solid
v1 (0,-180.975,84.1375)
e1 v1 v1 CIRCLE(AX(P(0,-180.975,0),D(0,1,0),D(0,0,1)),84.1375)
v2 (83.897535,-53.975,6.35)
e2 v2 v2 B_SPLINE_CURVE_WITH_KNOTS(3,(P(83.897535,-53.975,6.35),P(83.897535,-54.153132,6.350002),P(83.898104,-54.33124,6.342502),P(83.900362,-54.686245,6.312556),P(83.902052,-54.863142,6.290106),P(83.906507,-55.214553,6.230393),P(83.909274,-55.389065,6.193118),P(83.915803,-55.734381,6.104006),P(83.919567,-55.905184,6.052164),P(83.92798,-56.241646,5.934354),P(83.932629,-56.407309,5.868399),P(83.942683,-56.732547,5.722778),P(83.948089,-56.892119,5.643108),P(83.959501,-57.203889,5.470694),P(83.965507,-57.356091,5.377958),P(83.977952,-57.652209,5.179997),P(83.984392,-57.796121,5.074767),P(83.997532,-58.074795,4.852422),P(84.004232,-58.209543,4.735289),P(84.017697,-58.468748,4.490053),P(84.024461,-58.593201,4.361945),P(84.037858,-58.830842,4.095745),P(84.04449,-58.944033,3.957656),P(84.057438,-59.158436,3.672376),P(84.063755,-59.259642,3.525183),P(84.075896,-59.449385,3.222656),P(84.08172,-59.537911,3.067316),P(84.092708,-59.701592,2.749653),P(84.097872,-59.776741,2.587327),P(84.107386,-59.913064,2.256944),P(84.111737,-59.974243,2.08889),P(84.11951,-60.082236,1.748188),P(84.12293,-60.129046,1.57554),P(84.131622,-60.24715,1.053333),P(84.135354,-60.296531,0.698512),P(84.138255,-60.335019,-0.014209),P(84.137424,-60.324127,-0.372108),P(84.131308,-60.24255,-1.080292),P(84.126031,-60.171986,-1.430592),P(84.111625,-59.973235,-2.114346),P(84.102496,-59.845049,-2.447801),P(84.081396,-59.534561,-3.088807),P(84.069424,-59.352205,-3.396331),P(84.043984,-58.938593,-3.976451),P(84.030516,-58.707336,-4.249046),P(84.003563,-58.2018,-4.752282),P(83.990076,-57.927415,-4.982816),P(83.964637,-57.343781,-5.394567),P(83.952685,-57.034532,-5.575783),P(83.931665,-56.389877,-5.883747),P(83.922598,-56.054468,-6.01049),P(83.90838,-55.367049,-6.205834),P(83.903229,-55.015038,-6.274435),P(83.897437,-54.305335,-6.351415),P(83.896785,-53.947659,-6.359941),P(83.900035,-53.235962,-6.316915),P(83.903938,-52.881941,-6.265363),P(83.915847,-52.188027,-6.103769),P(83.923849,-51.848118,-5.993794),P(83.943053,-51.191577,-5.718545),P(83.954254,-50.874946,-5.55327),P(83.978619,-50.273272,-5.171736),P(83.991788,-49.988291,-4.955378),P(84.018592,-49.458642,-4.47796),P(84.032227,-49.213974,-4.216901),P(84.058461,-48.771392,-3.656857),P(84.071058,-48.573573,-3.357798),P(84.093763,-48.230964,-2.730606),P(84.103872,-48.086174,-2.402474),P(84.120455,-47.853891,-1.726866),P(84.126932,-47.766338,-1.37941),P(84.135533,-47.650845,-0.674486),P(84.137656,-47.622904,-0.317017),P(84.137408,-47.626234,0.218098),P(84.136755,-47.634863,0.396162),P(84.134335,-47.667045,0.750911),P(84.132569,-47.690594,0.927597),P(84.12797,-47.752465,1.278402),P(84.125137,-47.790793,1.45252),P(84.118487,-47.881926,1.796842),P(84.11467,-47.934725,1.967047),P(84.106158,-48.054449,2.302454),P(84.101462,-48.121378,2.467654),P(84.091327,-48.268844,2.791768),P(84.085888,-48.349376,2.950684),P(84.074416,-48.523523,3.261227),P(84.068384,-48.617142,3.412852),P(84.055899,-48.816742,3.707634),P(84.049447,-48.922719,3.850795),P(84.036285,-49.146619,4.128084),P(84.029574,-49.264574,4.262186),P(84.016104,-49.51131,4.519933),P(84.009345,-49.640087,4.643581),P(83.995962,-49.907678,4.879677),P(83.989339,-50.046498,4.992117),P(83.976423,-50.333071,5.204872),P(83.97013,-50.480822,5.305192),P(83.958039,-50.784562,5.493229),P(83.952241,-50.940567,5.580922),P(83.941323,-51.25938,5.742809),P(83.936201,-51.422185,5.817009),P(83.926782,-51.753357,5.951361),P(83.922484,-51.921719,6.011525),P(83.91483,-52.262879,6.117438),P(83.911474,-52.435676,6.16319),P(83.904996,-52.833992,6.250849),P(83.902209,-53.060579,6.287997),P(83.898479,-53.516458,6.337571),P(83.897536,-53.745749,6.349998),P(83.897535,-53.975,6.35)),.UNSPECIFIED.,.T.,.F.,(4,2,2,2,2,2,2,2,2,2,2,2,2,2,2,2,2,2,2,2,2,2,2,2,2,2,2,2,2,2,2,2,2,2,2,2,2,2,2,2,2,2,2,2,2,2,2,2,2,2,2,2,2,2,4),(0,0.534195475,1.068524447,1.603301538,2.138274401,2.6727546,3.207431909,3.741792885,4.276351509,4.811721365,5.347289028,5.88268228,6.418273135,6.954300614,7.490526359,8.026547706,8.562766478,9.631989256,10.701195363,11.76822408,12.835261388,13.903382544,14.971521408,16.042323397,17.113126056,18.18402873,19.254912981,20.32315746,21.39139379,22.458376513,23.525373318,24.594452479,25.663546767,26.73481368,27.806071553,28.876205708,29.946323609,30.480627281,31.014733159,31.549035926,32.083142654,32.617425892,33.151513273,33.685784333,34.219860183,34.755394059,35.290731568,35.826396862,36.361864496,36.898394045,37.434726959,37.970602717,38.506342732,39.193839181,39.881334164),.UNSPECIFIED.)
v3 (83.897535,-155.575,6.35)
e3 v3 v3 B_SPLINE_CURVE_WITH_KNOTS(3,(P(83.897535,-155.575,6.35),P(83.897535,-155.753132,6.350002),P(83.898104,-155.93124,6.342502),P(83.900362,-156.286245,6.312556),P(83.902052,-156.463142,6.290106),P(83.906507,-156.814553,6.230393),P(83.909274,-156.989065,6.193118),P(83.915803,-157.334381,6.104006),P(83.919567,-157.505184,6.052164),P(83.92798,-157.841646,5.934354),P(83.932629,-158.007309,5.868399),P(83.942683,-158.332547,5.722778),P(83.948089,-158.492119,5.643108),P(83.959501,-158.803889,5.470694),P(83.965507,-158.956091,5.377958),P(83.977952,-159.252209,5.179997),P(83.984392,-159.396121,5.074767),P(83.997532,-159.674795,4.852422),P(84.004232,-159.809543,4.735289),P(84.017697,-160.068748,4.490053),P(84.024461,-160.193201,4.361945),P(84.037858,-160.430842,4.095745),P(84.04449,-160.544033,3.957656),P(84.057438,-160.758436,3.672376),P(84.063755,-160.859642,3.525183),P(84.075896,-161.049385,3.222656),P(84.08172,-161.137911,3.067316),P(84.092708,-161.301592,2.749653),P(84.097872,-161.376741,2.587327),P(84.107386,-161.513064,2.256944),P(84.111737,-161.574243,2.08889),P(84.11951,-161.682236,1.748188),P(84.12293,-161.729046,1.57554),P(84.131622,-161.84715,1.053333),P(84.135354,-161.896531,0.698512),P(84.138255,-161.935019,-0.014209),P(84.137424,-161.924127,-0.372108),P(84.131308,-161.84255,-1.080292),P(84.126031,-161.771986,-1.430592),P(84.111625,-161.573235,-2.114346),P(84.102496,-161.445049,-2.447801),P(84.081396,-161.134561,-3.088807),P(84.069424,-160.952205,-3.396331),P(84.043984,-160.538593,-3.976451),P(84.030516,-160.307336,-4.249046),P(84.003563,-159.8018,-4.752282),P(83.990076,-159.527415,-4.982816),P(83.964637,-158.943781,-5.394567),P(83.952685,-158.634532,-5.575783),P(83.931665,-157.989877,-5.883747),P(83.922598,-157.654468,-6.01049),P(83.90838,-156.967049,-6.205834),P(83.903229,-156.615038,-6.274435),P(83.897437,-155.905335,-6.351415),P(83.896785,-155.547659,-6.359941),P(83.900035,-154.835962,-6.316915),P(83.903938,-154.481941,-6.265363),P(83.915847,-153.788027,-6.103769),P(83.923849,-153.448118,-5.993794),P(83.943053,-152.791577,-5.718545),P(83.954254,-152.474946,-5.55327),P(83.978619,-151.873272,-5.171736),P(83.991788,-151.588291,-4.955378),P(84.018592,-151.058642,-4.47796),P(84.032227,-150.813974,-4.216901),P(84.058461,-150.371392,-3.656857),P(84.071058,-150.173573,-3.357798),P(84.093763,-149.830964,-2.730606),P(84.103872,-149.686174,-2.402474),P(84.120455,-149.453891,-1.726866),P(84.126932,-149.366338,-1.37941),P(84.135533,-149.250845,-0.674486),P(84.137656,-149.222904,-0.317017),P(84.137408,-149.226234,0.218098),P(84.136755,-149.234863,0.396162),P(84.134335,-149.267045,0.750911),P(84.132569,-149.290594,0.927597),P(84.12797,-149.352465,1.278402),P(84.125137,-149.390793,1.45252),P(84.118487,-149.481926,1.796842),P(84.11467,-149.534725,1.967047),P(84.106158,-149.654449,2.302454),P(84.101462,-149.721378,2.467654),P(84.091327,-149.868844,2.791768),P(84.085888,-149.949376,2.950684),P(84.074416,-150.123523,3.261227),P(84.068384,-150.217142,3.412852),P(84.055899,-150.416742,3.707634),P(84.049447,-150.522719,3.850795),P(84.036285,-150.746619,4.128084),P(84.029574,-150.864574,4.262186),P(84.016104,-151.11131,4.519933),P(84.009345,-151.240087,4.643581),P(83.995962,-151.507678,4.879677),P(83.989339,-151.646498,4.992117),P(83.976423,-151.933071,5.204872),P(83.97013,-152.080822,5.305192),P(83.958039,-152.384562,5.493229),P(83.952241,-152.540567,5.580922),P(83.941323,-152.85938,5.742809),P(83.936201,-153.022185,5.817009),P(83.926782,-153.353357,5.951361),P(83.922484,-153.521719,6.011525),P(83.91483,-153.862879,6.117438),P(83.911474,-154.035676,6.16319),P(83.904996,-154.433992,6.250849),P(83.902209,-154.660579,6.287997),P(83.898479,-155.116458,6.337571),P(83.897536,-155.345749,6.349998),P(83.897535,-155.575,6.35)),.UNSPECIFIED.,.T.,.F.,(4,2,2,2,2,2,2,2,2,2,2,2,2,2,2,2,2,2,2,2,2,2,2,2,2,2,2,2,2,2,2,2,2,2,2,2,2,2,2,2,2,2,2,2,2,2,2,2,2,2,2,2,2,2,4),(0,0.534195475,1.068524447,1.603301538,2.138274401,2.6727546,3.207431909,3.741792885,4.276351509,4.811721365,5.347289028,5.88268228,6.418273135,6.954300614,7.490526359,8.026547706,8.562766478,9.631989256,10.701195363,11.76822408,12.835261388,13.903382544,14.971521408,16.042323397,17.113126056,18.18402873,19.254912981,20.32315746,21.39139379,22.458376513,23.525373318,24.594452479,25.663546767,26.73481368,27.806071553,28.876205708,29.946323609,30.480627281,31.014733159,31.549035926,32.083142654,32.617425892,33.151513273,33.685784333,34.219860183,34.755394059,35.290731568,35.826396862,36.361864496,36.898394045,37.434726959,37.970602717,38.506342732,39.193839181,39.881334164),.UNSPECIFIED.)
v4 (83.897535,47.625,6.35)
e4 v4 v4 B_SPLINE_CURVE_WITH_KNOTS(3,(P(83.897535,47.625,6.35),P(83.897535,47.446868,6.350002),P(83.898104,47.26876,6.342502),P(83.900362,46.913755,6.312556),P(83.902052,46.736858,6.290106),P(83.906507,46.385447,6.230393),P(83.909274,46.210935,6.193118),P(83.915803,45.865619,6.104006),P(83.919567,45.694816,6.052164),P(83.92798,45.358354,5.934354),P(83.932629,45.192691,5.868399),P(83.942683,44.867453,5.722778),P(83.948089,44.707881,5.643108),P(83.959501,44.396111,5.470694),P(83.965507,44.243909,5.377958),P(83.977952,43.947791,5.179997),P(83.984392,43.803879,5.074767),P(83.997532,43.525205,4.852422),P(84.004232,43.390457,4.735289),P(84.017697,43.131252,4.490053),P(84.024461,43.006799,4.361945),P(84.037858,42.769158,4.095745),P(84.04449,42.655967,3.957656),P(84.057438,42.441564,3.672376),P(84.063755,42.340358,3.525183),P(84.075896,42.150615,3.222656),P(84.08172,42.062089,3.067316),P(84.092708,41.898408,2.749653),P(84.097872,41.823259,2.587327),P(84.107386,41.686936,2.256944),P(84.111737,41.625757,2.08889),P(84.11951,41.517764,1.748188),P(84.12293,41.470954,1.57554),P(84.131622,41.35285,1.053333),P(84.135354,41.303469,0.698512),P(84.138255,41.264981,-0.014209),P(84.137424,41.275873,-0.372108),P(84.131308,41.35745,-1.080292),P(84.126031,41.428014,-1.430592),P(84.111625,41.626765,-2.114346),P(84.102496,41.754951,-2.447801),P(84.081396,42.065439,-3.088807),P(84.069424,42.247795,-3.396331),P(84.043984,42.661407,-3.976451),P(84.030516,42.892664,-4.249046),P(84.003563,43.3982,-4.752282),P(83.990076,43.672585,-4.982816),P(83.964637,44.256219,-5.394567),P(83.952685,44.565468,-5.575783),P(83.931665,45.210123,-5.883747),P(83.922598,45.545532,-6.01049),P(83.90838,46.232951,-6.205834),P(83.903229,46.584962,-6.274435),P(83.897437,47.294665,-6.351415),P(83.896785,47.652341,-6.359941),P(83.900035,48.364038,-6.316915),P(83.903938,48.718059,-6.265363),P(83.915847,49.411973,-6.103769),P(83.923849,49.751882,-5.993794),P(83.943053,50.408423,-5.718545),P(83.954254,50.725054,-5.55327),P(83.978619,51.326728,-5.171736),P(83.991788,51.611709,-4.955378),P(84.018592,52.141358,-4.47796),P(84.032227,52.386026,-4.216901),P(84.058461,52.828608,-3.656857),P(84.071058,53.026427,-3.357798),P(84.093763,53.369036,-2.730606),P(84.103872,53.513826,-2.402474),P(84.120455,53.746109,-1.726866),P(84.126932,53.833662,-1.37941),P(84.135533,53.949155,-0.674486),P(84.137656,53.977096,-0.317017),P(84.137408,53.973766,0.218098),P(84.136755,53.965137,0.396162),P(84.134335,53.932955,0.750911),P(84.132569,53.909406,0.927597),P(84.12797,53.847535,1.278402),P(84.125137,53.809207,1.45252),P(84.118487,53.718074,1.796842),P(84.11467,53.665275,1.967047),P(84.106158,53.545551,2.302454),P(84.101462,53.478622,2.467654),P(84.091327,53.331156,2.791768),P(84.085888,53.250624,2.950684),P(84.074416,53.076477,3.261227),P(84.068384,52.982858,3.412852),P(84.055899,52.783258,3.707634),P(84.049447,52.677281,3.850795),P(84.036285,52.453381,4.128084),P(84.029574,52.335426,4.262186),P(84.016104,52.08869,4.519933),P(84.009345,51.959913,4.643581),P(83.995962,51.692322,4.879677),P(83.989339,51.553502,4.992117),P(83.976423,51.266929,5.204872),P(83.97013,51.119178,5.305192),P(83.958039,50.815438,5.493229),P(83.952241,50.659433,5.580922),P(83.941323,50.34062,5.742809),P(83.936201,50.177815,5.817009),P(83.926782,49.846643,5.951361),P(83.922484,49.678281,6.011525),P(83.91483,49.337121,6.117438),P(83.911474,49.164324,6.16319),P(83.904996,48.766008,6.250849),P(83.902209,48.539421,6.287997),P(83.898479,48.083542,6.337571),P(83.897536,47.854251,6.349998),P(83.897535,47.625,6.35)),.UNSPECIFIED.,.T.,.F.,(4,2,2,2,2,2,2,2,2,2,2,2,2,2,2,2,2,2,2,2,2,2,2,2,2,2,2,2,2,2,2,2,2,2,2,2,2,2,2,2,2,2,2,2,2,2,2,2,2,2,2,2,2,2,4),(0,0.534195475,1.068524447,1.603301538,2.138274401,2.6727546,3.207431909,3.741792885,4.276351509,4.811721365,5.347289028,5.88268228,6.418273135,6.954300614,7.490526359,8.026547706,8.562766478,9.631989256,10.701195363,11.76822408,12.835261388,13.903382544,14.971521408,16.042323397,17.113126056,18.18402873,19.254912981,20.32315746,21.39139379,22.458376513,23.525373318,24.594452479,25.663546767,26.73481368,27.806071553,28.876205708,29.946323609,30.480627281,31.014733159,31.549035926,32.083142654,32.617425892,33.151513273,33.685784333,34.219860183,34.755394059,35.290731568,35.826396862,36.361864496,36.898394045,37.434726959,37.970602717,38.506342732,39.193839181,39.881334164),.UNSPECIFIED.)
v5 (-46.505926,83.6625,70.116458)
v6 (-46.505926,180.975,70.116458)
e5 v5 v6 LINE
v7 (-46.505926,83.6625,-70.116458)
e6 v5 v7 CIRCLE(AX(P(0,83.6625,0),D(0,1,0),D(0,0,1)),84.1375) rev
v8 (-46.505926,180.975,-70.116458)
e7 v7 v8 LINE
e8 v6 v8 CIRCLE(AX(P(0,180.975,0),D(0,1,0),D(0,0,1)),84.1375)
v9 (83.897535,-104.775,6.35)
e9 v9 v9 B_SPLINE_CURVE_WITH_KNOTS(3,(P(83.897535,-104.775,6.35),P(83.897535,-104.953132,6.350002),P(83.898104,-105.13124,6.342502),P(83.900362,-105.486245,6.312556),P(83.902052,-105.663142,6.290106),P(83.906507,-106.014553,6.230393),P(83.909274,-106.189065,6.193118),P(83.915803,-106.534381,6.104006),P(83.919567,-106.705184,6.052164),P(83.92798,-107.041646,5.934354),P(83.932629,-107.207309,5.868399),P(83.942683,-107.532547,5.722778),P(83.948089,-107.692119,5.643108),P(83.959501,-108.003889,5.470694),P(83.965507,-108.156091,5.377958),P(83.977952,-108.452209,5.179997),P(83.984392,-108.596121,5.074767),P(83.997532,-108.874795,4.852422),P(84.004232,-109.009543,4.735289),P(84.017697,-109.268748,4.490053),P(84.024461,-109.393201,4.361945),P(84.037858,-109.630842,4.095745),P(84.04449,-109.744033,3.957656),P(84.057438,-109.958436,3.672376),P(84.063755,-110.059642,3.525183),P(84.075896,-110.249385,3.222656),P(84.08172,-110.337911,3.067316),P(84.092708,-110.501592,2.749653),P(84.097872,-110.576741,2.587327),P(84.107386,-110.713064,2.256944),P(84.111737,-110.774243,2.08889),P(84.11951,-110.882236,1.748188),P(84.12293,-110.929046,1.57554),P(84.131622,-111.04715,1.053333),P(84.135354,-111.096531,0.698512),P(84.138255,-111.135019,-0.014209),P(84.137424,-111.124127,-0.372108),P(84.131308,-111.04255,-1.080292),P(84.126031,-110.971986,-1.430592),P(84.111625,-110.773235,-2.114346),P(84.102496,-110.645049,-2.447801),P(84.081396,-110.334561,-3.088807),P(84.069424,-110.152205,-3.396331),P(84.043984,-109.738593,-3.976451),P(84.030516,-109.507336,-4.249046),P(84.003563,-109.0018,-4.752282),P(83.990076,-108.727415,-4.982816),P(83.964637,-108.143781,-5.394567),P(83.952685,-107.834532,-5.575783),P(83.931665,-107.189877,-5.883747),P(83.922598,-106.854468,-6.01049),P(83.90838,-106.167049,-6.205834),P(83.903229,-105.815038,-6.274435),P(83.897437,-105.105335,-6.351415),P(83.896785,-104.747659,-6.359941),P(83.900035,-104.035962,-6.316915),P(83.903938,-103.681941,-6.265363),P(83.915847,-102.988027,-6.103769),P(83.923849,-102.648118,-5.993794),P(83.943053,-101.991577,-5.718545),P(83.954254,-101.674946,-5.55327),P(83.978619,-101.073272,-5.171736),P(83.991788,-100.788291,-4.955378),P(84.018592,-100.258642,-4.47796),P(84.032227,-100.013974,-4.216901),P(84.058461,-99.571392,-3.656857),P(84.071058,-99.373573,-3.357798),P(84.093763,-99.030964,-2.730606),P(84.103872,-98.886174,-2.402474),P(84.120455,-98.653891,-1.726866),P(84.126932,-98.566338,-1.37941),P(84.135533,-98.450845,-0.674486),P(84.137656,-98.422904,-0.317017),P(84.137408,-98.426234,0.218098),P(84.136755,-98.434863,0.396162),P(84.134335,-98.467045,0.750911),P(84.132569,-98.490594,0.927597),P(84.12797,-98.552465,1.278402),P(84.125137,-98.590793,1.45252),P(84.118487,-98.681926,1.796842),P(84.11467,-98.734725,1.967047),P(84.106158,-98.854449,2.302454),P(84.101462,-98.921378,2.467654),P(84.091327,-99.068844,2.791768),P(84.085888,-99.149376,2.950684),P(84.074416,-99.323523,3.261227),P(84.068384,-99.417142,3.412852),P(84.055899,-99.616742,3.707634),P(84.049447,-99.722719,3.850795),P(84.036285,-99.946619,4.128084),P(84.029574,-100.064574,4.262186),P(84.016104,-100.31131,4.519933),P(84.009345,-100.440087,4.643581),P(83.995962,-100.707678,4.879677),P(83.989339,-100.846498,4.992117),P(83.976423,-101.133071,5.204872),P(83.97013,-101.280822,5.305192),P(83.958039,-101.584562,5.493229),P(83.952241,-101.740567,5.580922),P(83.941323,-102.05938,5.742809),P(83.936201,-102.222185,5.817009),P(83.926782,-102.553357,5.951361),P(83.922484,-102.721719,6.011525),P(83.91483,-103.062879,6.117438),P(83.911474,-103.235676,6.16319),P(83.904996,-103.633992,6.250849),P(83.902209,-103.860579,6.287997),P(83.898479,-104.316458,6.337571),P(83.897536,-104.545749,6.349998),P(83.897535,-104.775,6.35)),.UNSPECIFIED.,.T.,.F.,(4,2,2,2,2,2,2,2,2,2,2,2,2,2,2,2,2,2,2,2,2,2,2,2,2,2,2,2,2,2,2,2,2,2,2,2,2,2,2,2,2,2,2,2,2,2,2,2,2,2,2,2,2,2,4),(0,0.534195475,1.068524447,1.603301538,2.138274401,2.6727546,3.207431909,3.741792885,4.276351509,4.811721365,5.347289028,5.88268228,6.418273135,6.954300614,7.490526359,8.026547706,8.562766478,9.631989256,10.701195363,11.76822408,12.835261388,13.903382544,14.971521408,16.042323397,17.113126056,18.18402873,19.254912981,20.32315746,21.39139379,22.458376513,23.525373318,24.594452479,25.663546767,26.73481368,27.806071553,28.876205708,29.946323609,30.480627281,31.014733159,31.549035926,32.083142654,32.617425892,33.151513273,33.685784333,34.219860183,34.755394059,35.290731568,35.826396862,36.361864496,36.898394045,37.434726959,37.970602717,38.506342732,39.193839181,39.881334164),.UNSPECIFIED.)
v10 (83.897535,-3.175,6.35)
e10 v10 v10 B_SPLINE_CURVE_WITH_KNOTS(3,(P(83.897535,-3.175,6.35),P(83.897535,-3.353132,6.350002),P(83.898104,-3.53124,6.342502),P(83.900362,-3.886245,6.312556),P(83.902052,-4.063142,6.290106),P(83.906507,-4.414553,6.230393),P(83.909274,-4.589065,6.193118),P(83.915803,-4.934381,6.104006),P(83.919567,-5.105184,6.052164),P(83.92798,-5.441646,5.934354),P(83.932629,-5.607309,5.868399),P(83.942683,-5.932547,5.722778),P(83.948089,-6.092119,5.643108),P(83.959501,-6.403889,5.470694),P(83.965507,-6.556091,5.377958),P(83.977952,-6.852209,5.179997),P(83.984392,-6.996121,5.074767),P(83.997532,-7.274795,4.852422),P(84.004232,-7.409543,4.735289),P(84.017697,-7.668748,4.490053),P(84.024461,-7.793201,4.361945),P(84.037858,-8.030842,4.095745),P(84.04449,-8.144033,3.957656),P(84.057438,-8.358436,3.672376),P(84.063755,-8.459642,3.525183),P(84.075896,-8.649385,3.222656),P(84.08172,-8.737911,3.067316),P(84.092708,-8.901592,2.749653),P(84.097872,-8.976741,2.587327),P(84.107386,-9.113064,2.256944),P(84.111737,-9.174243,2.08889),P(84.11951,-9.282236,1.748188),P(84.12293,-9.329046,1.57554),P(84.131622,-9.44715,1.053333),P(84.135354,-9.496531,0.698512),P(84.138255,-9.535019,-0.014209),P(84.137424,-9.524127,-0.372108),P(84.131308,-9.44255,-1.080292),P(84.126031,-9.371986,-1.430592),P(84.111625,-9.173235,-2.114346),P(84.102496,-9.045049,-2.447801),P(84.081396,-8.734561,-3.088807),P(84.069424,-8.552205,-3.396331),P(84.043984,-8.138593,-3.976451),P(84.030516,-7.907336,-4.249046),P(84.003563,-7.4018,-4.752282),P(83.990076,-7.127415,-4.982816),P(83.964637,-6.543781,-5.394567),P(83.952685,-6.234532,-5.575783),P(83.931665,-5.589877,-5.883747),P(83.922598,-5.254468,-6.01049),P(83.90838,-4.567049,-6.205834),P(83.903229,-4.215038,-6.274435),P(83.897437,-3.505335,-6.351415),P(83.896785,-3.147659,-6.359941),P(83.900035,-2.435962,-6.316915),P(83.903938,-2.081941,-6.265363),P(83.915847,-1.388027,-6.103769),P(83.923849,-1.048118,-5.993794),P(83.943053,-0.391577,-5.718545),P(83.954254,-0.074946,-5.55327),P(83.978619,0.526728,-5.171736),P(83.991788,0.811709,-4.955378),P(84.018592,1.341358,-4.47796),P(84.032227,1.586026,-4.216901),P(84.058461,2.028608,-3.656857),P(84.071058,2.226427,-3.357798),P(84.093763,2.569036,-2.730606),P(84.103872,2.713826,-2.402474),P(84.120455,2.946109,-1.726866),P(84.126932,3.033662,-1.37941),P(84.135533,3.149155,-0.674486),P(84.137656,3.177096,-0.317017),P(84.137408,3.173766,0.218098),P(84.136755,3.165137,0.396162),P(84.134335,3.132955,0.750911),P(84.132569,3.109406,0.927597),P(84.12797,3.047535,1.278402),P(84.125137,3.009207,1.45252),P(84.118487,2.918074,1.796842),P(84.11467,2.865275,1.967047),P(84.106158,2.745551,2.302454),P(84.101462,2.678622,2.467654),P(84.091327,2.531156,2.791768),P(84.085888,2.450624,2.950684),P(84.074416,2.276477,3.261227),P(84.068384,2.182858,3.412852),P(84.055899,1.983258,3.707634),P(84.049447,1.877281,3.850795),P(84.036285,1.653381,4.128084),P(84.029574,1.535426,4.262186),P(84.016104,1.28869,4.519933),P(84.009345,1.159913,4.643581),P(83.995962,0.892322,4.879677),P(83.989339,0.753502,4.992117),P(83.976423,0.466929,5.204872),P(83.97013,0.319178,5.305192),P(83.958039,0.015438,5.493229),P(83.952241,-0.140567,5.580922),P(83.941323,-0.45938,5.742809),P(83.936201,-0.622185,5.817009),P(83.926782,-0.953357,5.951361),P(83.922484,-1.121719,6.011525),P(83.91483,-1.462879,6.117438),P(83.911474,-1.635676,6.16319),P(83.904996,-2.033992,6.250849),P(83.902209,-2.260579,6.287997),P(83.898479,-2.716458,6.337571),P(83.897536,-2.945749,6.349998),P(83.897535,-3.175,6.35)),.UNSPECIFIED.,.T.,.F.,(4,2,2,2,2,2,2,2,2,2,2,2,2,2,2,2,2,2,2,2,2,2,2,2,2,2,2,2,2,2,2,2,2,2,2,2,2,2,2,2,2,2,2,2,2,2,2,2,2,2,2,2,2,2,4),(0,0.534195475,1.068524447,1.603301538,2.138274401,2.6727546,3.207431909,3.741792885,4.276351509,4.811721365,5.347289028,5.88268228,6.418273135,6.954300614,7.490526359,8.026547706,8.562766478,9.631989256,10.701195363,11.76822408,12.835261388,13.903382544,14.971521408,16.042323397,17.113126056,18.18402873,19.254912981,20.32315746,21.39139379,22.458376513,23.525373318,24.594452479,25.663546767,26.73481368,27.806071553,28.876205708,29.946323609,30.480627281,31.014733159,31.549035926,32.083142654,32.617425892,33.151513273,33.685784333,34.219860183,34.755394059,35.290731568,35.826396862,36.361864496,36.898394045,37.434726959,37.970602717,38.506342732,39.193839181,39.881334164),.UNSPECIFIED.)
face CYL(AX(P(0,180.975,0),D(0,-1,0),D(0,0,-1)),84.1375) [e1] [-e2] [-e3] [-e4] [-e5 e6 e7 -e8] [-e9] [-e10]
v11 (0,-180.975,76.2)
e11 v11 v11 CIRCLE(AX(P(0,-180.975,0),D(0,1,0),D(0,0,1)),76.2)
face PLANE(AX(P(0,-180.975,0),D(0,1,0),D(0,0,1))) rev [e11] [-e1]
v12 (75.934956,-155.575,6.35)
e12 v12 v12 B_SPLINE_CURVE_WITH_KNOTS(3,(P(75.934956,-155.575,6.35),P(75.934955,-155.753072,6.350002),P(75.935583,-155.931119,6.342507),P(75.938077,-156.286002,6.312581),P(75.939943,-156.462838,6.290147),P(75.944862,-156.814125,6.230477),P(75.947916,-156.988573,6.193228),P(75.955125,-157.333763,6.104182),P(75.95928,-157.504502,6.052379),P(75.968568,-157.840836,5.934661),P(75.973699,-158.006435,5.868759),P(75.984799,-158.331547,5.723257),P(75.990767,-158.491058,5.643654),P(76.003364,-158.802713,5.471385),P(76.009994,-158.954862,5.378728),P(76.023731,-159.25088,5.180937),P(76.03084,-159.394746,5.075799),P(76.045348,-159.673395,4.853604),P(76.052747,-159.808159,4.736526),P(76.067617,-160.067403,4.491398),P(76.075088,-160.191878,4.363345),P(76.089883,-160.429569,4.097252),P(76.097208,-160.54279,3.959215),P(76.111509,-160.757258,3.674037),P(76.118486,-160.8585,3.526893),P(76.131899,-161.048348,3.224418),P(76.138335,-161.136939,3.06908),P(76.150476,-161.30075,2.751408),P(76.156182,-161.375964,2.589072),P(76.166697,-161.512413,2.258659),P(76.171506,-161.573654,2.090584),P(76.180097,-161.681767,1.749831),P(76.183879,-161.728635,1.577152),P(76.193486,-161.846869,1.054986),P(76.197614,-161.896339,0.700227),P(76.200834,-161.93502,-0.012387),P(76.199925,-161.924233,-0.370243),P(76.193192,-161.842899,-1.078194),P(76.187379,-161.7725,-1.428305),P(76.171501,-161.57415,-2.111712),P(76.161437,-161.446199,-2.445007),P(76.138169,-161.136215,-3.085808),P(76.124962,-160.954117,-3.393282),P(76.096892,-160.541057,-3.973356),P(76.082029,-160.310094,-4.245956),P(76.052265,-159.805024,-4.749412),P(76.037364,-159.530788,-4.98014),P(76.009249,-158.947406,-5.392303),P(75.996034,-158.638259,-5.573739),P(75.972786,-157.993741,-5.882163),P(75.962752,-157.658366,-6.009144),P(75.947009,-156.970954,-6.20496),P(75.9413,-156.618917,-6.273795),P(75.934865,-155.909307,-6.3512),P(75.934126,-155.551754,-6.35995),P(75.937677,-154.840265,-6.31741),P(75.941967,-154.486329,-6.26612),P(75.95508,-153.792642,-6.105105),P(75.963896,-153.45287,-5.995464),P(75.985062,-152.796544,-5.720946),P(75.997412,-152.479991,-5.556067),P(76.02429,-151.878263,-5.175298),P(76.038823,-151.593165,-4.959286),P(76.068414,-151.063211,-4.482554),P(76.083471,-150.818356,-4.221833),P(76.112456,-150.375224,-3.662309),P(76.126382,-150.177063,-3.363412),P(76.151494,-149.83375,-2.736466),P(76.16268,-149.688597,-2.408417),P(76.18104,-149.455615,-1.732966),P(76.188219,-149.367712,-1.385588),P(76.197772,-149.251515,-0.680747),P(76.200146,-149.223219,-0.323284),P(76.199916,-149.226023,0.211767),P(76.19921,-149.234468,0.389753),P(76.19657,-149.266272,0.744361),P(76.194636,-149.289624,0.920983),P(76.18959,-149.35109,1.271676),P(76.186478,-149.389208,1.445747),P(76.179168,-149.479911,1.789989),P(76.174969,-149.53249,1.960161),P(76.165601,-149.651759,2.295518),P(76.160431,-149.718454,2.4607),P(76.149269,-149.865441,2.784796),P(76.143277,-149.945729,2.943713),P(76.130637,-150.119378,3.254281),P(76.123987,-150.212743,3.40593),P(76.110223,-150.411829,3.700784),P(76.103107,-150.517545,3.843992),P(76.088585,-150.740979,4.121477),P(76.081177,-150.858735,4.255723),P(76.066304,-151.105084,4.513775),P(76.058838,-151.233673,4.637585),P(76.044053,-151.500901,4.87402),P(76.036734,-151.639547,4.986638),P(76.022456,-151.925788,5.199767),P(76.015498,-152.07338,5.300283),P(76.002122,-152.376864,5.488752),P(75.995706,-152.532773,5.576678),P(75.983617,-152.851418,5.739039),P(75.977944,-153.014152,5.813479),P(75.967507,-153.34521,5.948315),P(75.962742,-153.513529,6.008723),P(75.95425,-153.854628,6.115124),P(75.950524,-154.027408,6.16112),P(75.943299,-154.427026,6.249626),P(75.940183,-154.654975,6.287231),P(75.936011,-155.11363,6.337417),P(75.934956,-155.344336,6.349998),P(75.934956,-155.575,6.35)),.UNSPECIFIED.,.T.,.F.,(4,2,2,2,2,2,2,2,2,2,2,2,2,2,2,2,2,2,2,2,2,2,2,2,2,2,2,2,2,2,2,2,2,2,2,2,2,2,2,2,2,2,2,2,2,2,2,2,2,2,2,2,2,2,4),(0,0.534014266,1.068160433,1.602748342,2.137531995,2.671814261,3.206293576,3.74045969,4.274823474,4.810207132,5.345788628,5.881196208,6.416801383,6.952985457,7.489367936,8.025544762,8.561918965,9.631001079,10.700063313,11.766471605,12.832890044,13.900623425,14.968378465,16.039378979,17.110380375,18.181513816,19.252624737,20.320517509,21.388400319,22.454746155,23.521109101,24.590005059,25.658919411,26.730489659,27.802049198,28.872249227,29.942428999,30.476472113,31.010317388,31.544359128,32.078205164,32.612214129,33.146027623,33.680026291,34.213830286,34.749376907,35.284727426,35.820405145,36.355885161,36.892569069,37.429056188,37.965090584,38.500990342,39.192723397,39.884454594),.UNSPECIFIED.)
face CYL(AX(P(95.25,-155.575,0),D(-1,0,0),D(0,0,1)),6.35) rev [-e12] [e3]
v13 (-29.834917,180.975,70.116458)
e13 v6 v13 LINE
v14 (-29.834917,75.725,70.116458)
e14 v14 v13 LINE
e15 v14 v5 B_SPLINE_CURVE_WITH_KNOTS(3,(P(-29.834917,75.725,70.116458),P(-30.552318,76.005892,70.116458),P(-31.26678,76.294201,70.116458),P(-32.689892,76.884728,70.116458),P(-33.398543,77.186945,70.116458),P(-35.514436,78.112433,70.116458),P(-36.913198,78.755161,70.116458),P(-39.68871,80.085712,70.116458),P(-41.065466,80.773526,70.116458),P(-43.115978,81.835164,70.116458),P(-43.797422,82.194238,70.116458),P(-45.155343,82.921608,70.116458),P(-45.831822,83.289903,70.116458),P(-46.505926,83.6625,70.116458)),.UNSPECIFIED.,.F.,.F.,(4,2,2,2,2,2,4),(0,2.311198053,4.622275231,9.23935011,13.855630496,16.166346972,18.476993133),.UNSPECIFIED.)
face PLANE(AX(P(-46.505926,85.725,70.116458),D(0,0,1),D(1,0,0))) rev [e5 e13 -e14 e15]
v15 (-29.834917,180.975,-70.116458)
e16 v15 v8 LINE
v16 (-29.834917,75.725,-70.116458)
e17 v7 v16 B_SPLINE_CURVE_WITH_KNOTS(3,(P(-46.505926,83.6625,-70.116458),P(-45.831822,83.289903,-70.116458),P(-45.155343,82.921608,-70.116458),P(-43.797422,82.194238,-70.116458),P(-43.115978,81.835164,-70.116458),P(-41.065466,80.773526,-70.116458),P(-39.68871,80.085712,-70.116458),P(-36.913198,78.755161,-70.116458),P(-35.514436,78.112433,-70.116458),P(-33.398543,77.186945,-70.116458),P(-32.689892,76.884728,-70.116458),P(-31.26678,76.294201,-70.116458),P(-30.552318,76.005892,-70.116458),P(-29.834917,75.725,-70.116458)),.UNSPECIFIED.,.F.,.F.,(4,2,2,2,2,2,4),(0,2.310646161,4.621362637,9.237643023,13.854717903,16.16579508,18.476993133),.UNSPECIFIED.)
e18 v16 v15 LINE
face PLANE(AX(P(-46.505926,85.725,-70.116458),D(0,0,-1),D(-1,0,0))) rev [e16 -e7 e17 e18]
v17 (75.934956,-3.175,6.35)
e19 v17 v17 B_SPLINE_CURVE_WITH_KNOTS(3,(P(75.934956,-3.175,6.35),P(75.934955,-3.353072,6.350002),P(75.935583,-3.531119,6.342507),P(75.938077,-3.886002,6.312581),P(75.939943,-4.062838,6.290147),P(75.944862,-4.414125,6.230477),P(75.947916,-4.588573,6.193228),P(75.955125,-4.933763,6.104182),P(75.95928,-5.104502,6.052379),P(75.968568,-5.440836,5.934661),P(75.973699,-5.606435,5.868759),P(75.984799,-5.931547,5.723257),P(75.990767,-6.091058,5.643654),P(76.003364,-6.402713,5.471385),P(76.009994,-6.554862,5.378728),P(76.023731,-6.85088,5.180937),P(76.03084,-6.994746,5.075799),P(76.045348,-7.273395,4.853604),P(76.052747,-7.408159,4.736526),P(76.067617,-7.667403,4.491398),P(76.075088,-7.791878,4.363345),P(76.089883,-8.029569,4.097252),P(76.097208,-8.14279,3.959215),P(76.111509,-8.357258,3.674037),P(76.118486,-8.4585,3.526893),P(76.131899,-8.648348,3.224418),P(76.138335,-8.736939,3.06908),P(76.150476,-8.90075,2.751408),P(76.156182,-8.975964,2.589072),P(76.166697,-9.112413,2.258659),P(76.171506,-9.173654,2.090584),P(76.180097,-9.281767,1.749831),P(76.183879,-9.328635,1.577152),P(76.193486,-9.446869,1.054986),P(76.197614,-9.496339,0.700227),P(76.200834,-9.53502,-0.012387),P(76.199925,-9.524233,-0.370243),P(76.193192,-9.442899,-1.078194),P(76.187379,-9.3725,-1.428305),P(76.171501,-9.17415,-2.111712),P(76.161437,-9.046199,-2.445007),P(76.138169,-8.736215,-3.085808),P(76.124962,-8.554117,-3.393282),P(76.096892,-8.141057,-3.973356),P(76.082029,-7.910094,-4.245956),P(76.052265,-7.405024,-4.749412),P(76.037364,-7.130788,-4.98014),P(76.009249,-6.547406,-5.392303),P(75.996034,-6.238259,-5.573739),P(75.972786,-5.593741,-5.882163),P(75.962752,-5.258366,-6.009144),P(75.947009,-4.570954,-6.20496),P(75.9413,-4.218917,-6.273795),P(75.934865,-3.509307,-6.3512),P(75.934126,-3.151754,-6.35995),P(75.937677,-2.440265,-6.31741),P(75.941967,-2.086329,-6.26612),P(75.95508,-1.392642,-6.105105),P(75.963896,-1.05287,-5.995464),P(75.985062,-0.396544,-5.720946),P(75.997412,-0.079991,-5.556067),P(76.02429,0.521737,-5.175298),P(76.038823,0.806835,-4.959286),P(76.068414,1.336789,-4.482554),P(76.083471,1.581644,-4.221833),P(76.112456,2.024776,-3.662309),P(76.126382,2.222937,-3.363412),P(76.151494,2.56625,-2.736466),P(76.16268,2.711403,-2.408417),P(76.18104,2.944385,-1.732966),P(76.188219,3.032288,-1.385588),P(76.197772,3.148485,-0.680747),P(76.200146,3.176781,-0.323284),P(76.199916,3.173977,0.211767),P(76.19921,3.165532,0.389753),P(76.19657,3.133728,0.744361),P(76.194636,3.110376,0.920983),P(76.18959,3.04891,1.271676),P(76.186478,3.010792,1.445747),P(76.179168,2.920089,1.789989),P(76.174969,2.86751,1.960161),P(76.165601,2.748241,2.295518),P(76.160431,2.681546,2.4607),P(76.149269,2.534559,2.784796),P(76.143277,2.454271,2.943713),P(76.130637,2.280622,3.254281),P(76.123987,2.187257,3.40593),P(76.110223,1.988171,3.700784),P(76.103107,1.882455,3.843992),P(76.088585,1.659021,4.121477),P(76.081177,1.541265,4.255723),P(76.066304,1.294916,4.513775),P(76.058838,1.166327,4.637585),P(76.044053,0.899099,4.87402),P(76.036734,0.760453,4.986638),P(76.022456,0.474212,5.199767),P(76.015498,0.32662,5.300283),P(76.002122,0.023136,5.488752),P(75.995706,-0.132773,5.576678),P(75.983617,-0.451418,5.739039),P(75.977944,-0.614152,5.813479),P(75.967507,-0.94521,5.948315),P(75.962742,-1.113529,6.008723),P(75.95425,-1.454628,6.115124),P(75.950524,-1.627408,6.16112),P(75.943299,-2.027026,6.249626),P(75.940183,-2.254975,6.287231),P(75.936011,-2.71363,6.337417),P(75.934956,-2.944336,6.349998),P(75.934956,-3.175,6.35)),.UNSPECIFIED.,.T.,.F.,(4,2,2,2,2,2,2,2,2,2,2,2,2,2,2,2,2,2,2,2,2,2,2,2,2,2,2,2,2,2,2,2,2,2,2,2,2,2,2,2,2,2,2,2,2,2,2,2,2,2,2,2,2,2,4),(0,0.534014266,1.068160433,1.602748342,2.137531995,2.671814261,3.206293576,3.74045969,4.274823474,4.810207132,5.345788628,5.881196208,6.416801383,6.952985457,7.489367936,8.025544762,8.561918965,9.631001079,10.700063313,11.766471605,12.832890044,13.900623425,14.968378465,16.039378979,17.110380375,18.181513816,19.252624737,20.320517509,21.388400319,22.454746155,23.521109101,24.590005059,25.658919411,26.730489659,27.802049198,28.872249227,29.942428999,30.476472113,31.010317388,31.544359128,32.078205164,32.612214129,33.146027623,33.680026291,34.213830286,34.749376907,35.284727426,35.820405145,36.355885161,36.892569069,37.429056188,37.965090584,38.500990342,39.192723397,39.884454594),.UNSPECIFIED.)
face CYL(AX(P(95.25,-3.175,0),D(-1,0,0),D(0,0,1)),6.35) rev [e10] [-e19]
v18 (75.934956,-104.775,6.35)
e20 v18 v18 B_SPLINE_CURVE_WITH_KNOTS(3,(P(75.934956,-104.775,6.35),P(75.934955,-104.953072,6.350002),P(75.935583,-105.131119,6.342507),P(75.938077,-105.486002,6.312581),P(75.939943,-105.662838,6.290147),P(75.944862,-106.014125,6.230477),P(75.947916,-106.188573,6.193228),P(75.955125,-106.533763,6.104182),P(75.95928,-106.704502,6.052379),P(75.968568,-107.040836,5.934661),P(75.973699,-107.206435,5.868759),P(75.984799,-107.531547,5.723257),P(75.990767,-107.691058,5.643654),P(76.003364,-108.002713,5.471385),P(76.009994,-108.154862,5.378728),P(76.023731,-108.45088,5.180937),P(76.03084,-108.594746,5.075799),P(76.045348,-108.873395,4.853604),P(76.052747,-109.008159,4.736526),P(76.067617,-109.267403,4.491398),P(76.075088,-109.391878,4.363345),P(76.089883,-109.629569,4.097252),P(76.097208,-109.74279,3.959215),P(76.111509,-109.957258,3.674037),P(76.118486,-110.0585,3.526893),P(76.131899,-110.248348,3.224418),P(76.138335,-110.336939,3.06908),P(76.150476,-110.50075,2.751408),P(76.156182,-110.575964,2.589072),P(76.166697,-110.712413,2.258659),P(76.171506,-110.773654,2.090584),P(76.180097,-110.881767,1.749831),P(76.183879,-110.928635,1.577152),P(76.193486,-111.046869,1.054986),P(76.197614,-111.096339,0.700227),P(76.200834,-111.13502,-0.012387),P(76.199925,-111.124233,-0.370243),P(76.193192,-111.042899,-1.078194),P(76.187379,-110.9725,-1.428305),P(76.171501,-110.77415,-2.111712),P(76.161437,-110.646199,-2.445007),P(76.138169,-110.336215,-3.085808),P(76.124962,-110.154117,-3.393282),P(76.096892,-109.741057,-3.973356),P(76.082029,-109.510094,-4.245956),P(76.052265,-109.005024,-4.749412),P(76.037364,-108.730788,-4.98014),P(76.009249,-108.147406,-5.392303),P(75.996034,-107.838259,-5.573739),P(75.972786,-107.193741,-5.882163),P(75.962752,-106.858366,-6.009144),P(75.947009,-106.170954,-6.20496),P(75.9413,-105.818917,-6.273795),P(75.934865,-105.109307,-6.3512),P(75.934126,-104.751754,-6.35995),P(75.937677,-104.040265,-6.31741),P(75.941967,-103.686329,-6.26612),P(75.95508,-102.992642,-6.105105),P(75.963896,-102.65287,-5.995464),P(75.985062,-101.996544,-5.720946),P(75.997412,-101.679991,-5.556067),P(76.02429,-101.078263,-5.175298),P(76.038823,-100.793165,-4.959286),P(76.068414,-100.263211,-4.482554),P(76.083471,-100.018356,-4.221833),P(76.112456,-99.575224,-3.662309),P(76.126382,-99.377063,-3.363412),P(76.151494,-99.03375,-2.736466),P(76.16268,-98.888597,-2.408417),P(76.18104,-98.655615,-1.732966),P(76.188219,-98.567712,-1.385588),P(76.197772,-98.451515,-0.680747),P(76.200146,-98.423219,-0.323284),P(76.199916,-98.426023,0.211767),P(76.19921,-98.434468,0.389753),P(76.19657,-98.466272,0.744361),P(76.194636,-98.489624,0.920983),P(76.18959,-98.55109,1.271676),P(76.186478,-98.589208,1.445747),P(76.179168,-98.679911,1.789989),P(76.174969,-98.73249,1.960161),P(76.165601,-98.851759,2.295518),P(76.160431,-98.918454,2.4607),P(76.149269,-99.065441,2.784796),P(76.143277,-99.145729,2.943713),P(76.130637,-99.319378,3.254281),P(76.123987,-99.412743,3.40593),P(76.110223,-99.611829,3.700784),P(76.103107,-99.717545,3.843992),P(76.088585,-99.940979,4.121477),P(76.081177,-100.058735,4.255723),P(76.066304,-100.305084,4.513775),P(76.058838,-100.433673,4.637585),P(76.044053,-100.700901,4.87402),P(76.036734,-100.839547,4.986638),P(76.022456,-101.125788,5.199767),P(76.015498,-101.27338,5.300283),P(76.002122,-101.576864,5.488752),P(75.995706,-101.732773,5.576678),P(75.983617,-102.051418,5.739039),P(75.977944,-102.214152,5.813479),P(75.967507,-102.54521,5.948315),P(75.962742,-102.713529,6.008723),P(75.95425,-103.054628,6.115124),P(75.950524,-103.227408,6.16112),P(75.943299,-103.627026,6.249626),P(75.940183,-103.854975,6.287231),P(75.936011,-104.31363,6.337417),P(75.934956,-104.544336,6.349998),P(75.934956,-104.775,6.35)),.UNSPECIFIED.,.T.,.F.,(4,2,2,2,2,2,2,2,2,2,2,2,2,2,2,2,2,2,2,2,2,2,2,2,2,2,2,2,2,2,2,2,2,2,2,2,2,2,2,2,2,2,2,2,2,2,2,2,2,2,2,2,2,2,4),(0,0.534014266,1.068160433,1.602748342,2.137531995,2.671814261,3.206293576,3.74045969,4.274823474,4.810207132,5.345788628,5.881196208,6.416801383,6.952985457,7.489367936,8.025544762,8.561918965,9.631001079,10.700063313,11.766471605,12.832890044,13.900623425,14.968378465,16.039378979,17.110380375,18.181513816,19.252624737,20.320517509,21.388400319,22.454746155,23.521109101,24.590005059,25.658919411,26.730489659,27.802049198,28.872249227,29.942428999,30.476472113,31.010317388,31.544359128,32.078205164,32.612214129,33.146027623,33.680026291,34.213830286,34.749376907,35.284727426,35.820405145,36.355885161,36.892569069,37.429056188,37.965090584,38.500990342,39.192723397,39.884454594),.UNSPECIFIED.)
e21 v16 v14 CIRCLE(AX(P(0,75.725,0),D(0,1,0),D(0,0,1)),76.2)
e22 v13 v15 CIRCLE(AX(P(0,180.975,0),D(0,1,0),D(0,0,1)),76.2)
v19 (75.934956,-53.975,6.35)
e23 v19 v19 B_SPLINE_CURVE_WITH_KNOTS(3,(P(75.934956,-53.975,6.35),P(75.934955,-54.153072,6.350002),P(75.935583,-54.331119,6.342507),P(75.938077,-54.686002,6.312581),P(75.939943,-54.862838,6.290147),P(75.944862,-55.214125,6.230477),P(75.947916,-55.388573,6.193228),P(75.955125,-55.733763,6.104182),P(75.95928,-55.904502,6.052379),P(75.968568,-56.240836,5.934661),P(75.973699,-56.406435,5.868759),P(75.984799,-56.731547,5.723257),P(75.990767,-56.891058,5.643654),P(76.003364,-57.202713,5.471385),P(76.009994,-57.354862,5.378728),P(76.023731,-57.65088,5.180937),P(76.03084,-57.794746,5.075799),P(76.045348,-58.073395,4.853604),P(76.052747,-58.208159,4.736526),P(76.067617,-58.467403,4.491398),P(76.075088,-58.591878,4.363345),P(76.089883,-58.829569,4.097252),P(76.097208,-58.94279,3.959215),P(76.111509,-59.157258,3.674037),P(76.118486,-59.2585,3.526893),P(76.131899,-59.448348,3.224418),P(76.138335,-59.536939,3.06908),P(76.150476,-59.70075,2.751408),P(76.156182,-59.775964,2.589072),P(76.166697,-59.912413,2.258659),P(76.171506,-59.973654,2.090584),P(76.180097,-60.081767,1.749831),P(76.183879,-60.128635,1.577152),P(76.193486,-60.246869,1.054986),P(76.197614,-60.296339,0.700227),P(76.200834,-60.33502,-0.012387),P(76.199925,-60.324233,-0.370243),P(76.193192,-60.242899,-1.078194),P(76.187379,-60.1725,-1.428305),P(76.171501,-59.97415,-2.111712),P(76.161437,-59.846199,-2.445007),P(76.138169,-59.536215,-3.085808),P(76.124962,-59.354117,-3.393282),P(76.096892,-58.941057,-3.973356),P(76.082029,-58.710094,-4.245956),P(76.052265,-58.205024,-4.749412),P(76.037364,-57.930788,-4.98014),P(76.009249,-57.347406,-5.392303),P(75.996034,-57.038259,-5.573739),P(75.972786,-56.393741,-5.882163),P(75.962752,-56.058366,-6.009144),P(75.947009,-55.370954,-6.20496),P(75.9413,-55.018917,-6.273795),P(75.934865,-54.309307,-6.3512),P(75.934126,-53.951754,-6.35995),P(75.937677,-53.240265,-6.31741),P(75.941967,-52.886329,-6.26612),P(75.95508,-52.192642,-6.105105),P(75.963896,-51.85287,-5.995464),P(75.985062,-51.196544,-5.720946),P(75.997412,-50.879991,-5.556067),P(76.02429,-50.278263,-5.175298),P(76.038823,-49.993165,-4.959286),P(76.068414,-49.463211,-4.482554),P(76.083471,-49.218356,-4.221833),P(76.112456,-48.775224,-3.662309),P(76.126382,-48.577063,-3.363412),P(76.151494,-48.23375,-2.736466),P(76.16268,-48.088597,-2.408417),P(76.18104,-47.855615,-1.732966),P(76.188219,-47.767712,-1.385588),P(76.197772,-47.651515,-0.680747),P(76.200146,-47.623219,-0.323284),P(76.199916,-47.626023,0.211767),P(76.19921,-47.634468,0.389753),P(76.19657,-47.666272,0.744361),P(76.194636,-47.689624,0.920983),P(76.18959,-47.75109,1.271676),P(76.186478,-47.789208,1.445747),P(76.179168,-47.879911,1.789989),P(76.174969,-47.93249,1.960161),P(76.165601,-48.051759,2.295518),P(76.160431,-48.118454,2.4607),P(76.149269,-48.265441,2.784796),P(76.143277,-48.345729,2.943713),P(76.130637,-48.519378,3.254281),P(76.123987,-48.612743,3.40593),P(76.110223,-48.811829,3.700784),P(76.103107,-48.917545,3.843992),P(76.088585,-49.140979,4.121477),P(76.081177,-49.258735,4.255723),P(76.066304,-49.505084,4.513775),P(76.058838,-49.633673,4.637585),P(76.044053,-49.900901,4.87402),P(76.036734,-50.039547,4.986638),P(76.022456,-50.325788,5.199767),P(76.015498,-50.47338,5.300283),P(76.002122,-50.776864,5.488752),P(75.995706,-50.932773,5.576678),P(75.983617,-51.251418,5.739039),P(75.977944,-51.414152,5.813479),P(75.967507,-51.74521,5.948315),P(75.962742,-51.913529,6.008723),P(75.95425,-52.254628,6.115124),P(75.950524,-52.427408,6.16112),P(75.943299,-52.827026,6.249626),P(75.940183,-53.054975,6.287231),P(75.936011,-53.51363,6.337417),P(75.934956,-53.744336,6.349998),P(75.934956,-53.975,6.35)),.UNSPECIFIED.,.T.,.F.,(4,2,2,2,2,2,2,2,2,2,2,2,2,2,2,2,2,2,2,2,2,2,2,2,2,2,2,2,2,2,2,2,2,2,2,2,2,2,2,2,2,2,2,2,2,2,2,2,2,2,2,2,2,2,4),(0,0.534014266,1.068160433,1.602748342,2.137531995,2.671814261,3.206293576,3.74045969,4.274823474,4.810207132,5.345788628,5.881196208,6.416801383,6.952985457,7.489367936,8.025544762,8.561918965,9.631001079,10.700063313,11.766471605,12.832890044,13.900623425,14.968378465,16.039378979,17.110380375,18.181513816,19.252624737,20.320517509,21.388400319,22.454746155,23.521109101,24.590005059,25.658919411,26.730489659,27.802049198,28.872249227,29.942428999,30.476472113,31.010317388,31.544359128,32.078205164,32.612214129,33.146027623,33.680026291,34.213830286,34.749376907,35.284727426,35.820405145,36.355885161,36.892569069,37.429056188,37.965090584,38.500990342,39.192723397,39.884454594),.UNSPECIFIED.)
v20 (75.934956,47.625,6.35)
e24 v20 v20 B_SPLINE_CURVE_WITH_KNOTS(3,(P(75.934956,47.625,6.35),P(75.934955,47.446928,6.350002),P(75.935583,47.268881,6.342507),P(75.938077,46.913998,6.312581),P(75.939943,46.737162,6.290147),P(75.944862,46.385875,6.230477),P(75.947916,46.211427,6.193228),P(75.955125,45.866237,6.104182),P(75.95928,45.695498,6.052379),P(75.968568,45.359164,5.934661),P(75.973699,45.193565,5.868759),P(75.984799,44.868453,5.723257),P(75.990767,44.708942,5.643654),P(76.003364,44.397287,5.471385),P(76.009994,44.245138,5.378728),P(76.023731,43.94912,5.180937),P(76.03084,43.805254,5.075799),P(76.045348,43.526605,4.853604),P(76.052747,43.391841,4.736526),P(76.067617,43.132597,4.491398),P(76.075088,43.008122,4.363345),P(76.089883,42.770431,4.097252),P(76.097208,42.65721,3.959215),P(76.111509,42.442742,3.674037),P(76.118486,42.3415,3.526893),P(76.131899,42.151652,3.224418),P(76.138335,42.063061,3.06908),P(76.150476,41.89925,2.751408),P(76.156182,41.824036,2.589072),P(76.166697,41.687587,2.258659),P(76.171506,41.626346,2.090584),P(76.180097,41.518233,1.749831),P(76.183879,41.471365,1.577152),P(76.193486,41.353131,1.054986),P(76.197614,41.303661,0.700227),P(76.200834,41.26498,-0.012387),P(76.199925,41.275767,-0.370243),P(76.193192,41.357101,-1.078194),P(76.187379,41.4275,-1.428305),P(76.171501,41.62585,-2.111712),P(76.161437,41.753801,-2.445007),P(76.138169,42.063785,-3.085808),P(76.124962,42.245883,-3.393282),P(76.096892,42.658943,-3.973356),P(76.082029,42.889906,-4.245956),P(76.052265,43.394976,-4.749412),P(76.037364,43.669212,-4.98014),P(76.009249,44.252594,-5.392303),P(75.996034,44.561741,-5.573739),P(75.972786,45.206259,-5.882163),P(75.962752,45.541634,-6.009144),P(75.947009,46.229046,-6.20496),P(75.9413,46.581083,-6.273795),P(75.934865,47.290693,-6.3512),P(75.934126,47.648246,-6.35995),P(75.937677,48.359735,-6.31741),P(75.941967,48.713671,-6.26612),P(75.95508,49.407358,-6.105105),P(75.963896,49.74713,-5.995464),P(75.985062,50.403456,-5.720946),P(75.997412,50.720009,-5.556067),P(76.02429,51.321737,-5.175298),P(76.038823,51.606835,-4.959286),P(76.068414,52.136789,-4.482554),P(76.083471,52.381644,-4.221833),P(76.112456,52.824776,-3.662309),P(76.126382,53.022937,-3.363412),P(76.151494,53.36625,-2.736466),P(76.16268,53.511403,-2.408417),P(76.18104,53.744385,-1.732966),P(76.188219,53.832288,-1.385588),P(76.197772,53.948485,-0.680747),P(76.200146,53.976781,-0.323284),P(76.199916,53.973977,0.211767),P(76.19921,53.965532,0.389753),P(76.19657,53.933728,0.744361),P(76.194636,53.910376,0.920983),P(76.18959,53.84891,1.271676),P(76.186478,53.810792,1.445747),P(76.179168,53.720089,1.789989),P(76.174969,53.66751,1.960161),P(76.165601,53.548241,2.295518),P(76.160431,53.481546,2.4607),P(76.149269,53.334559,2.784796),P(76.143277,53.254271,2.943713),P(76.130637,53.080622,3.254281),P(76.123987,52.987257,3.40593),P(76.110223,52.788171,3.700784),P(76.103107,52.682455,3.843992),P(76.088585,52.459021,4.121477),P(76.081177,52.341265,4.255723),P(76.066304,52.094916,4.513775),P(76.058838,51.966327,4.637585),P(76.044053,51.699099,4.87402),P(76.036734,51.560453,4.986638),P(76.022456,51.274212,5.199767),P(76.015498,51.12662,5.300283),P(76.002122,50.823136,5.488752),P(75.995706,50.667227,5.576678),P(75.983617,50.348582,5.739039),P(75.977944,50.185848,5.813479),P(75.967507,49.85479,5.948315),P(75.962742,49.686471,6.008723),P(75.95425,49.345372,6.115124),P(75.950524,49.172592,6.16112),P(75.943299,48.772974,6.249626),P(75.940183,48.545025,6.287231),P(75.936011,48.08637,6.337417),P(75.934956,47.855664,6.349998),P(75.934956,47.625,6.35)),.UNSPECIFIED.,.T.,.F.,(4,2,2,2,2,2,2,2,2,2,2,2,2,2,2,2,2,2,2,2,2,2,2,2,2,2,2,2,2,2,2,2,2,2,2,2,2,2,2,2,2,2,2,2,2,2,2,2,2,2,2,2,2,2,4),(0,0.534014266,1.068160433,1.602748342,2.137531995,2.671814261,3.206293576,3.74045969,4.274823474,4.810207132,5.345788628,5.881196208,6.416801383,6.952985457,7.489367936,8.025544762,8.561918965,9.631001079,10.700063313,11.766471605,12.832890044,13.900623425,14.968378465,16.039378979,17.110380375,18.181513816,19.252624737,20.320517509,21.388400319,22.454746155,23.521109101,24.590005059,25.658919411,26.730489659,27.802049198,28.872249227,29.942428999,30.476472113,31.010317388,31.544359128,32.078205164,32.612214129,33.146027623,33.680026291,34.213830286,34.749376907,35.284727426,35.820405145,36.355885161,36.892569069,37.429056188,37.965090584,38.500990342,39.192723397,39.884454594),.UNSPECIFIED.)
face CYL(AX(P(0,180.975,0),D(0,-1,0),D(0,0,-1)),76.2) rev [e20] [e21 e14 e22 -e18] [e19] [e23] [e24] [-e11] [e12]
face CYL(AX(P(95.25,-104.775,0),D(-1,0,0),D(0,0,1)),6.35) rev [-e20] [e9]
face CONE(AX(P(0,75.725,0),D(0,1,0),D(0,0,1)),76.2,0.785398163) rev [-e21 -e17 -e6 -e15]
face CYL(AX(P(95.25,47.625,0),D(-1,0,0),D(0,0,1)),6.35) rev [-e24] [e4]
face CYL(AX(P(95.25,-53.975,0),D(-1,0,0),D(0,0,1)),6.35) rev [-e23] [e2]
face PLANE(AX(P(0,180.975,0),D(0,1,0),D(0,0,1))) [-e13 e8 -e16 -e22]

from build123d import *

# Parameters (mm, degrees)
SKETCH1_R           = 84.1375
SKETCH1_R_2         = 76.2
BOSS_EXTRUDE1_DEPTH = 180.975
CUT_EXTRUDE1_DEPTH  = 95.25
CUT_EXTRUDE2_START  = -95.25
CUT_EXTRUDE2_DEPTH  = 95.25
CHAMFER2_SIZE       = 10
SKETCH7_R           = 6.35
CUT_EXTRUDE9_DEPTH  = 95.25


with BuildPart() as part:
    # Sketch1 → Boss-Extrude1 (new, symmetric)
    with BuildSketch(Plane(origin=(0, 0, 0), x_dir=(1, 0, 0), z_dir=(0, 1, 0))):
        with Locations(Location((0, 0, 0), (0, 0, 270))):
            Circle(SKETCH1_R)
        with Locations(Location((0, 0, 0), (0, 0, 270))):
            Circle(SKETCH1_R_2, mode=Mode.SUBTRACT)
    extrude(amount=BOSS_EXTRUDE1_DEPTH, both=True)

    # Sketch2 → Cut-Extrude1 (cut)
    with BuildSketch(Plane(origin=(0, 180.975, 0), x_dir=(1, 0, 0), z_dir=(0, 1, 0))):
        with BuildLine():
            Line((0, 0), (-42.123694676, 63.498301921))
            Line((-42.123694676, 63.498301921), (-46.505926486, 70.116458181))
            ThreePointArc((-46.505926486, 70.116458181), (-84.1375, 0), (-46.505926486, -70.116458181))
            Line((-46.505926486, -70.116458181), (-42.118574931, -63.501697976))
            Line((-42.118574931, -63.501697976), (0, 0))
        make_face()
    extrude(amount=-CUT_EXTRUDE1_DEPTH, mode=Mode.SUBTRACT)

    # Sketch3 → Cut-Extrude2 (cut)
    with BuildSketch(Plane(origin=(0, 180.975, 0), x_dir=(1, 0, 0), z_dir=(0, 1, 0)).offset(CUT_EXTRUDE2_START)):
        with BuildLine():
            Line((-46.505926486, -70.116458181), (-29.83491733, -70.116458181))
            ThreePointArc((-29.83491733, -70.116458181), (-36.128451742, -67.090796498), (-42.118574931, -63.501697976))
            Line((-42.118574931, -63.501697976), (-46.505926486, -70.116458181))
        make_face()
        with BuildLine():
            Line((-46.505926486, 70.116458181), (-29.83491733, 70.116458181))
            ThreePointArc((-29.83491733, 70.116458181), (-36.131156341, 67.089339999), (-42.123694676, 63.498301921))
            Line((-42.123694676, 63.498301921), (-46.505926486, 70.116458181))
        make_face()
    extrude(amount=CUT_EXTRUDE2_DEPTH, mode=Mode.SUBTRACT)

    # Chamfer2
    # the kernel refuses this chamfer: 10 mm, written as the material it takes off along each edge
    with BuildSketch(Plane(origin=(0, 85.725, 0), x_dir=(-0.0644623510736034, 0, 0.9979201397376763), z_dir=(0.9979201397376763, 0, 0.0644623510736034))) as chamfer2_piece_1_section:
        Polygon((76.2, CHAMFER2_SIZE), (76.2 + CHAMFER2_SIZE, 0), (76.2, 0), align=None)
    chamfer2_piece_1 = revolve(axis=Axis((0, 85.725, 0), (0, -1, 0)), revolution_arc=172.608033228, mode=Mode.PRIVATE)
    chamfer2_piece_1 = split(chamfer2_piece_1, bisect_by=Plane(origin=(-81.050363846, 80.874636154, 70.116458181), z_dir=(0, 0, -1)), keep=Keep.TOP, mode=Mode.PRIVATE)
    chamfer2_piece_1 = split(chamfer2_piece_1, bisect_by=Plane(origin=(-81.050363846, 80.874636154, -70.116458181), z_dir=(0, 0, 1)), keep=Keep.TOP, mode=Mode.PRIVATE)
    add(chamfer2_piece_1, mode=Mode.SUBTRACT)

    # Sketch7 → Cut-Extrude9 (cut)
    with BuildSketch(Plane(origin=(0, 0, 0), x_dir=(0, 0, -1), z_dir=(1, 0, 0))):
        with Locations(Location((0, 47.625, 0), (0, 0, 180))):
            Circle(SKETCH7_R)
        with Locations(Location((0, -3.175, 0), (0, 0, 180))):
            Circle(SKETCH7_R)
        with Locations(Location((0, -53.975, 0), (0, 0, 180))):
            Circle(SKETCH7_R)
        with Locations(Location((0, -104.775, 0), (0, 0, 180))):
            Circle(SKETCH7_R)
        with Locations(Location((0, -155.575, 0), (0, 0, 180))):
            Circle(SKETCH7_R)
    extrude(amount=CUT_EXTRUDE9_DEPTH, mode=Mode.SUBTRACT)


solid = part.part
